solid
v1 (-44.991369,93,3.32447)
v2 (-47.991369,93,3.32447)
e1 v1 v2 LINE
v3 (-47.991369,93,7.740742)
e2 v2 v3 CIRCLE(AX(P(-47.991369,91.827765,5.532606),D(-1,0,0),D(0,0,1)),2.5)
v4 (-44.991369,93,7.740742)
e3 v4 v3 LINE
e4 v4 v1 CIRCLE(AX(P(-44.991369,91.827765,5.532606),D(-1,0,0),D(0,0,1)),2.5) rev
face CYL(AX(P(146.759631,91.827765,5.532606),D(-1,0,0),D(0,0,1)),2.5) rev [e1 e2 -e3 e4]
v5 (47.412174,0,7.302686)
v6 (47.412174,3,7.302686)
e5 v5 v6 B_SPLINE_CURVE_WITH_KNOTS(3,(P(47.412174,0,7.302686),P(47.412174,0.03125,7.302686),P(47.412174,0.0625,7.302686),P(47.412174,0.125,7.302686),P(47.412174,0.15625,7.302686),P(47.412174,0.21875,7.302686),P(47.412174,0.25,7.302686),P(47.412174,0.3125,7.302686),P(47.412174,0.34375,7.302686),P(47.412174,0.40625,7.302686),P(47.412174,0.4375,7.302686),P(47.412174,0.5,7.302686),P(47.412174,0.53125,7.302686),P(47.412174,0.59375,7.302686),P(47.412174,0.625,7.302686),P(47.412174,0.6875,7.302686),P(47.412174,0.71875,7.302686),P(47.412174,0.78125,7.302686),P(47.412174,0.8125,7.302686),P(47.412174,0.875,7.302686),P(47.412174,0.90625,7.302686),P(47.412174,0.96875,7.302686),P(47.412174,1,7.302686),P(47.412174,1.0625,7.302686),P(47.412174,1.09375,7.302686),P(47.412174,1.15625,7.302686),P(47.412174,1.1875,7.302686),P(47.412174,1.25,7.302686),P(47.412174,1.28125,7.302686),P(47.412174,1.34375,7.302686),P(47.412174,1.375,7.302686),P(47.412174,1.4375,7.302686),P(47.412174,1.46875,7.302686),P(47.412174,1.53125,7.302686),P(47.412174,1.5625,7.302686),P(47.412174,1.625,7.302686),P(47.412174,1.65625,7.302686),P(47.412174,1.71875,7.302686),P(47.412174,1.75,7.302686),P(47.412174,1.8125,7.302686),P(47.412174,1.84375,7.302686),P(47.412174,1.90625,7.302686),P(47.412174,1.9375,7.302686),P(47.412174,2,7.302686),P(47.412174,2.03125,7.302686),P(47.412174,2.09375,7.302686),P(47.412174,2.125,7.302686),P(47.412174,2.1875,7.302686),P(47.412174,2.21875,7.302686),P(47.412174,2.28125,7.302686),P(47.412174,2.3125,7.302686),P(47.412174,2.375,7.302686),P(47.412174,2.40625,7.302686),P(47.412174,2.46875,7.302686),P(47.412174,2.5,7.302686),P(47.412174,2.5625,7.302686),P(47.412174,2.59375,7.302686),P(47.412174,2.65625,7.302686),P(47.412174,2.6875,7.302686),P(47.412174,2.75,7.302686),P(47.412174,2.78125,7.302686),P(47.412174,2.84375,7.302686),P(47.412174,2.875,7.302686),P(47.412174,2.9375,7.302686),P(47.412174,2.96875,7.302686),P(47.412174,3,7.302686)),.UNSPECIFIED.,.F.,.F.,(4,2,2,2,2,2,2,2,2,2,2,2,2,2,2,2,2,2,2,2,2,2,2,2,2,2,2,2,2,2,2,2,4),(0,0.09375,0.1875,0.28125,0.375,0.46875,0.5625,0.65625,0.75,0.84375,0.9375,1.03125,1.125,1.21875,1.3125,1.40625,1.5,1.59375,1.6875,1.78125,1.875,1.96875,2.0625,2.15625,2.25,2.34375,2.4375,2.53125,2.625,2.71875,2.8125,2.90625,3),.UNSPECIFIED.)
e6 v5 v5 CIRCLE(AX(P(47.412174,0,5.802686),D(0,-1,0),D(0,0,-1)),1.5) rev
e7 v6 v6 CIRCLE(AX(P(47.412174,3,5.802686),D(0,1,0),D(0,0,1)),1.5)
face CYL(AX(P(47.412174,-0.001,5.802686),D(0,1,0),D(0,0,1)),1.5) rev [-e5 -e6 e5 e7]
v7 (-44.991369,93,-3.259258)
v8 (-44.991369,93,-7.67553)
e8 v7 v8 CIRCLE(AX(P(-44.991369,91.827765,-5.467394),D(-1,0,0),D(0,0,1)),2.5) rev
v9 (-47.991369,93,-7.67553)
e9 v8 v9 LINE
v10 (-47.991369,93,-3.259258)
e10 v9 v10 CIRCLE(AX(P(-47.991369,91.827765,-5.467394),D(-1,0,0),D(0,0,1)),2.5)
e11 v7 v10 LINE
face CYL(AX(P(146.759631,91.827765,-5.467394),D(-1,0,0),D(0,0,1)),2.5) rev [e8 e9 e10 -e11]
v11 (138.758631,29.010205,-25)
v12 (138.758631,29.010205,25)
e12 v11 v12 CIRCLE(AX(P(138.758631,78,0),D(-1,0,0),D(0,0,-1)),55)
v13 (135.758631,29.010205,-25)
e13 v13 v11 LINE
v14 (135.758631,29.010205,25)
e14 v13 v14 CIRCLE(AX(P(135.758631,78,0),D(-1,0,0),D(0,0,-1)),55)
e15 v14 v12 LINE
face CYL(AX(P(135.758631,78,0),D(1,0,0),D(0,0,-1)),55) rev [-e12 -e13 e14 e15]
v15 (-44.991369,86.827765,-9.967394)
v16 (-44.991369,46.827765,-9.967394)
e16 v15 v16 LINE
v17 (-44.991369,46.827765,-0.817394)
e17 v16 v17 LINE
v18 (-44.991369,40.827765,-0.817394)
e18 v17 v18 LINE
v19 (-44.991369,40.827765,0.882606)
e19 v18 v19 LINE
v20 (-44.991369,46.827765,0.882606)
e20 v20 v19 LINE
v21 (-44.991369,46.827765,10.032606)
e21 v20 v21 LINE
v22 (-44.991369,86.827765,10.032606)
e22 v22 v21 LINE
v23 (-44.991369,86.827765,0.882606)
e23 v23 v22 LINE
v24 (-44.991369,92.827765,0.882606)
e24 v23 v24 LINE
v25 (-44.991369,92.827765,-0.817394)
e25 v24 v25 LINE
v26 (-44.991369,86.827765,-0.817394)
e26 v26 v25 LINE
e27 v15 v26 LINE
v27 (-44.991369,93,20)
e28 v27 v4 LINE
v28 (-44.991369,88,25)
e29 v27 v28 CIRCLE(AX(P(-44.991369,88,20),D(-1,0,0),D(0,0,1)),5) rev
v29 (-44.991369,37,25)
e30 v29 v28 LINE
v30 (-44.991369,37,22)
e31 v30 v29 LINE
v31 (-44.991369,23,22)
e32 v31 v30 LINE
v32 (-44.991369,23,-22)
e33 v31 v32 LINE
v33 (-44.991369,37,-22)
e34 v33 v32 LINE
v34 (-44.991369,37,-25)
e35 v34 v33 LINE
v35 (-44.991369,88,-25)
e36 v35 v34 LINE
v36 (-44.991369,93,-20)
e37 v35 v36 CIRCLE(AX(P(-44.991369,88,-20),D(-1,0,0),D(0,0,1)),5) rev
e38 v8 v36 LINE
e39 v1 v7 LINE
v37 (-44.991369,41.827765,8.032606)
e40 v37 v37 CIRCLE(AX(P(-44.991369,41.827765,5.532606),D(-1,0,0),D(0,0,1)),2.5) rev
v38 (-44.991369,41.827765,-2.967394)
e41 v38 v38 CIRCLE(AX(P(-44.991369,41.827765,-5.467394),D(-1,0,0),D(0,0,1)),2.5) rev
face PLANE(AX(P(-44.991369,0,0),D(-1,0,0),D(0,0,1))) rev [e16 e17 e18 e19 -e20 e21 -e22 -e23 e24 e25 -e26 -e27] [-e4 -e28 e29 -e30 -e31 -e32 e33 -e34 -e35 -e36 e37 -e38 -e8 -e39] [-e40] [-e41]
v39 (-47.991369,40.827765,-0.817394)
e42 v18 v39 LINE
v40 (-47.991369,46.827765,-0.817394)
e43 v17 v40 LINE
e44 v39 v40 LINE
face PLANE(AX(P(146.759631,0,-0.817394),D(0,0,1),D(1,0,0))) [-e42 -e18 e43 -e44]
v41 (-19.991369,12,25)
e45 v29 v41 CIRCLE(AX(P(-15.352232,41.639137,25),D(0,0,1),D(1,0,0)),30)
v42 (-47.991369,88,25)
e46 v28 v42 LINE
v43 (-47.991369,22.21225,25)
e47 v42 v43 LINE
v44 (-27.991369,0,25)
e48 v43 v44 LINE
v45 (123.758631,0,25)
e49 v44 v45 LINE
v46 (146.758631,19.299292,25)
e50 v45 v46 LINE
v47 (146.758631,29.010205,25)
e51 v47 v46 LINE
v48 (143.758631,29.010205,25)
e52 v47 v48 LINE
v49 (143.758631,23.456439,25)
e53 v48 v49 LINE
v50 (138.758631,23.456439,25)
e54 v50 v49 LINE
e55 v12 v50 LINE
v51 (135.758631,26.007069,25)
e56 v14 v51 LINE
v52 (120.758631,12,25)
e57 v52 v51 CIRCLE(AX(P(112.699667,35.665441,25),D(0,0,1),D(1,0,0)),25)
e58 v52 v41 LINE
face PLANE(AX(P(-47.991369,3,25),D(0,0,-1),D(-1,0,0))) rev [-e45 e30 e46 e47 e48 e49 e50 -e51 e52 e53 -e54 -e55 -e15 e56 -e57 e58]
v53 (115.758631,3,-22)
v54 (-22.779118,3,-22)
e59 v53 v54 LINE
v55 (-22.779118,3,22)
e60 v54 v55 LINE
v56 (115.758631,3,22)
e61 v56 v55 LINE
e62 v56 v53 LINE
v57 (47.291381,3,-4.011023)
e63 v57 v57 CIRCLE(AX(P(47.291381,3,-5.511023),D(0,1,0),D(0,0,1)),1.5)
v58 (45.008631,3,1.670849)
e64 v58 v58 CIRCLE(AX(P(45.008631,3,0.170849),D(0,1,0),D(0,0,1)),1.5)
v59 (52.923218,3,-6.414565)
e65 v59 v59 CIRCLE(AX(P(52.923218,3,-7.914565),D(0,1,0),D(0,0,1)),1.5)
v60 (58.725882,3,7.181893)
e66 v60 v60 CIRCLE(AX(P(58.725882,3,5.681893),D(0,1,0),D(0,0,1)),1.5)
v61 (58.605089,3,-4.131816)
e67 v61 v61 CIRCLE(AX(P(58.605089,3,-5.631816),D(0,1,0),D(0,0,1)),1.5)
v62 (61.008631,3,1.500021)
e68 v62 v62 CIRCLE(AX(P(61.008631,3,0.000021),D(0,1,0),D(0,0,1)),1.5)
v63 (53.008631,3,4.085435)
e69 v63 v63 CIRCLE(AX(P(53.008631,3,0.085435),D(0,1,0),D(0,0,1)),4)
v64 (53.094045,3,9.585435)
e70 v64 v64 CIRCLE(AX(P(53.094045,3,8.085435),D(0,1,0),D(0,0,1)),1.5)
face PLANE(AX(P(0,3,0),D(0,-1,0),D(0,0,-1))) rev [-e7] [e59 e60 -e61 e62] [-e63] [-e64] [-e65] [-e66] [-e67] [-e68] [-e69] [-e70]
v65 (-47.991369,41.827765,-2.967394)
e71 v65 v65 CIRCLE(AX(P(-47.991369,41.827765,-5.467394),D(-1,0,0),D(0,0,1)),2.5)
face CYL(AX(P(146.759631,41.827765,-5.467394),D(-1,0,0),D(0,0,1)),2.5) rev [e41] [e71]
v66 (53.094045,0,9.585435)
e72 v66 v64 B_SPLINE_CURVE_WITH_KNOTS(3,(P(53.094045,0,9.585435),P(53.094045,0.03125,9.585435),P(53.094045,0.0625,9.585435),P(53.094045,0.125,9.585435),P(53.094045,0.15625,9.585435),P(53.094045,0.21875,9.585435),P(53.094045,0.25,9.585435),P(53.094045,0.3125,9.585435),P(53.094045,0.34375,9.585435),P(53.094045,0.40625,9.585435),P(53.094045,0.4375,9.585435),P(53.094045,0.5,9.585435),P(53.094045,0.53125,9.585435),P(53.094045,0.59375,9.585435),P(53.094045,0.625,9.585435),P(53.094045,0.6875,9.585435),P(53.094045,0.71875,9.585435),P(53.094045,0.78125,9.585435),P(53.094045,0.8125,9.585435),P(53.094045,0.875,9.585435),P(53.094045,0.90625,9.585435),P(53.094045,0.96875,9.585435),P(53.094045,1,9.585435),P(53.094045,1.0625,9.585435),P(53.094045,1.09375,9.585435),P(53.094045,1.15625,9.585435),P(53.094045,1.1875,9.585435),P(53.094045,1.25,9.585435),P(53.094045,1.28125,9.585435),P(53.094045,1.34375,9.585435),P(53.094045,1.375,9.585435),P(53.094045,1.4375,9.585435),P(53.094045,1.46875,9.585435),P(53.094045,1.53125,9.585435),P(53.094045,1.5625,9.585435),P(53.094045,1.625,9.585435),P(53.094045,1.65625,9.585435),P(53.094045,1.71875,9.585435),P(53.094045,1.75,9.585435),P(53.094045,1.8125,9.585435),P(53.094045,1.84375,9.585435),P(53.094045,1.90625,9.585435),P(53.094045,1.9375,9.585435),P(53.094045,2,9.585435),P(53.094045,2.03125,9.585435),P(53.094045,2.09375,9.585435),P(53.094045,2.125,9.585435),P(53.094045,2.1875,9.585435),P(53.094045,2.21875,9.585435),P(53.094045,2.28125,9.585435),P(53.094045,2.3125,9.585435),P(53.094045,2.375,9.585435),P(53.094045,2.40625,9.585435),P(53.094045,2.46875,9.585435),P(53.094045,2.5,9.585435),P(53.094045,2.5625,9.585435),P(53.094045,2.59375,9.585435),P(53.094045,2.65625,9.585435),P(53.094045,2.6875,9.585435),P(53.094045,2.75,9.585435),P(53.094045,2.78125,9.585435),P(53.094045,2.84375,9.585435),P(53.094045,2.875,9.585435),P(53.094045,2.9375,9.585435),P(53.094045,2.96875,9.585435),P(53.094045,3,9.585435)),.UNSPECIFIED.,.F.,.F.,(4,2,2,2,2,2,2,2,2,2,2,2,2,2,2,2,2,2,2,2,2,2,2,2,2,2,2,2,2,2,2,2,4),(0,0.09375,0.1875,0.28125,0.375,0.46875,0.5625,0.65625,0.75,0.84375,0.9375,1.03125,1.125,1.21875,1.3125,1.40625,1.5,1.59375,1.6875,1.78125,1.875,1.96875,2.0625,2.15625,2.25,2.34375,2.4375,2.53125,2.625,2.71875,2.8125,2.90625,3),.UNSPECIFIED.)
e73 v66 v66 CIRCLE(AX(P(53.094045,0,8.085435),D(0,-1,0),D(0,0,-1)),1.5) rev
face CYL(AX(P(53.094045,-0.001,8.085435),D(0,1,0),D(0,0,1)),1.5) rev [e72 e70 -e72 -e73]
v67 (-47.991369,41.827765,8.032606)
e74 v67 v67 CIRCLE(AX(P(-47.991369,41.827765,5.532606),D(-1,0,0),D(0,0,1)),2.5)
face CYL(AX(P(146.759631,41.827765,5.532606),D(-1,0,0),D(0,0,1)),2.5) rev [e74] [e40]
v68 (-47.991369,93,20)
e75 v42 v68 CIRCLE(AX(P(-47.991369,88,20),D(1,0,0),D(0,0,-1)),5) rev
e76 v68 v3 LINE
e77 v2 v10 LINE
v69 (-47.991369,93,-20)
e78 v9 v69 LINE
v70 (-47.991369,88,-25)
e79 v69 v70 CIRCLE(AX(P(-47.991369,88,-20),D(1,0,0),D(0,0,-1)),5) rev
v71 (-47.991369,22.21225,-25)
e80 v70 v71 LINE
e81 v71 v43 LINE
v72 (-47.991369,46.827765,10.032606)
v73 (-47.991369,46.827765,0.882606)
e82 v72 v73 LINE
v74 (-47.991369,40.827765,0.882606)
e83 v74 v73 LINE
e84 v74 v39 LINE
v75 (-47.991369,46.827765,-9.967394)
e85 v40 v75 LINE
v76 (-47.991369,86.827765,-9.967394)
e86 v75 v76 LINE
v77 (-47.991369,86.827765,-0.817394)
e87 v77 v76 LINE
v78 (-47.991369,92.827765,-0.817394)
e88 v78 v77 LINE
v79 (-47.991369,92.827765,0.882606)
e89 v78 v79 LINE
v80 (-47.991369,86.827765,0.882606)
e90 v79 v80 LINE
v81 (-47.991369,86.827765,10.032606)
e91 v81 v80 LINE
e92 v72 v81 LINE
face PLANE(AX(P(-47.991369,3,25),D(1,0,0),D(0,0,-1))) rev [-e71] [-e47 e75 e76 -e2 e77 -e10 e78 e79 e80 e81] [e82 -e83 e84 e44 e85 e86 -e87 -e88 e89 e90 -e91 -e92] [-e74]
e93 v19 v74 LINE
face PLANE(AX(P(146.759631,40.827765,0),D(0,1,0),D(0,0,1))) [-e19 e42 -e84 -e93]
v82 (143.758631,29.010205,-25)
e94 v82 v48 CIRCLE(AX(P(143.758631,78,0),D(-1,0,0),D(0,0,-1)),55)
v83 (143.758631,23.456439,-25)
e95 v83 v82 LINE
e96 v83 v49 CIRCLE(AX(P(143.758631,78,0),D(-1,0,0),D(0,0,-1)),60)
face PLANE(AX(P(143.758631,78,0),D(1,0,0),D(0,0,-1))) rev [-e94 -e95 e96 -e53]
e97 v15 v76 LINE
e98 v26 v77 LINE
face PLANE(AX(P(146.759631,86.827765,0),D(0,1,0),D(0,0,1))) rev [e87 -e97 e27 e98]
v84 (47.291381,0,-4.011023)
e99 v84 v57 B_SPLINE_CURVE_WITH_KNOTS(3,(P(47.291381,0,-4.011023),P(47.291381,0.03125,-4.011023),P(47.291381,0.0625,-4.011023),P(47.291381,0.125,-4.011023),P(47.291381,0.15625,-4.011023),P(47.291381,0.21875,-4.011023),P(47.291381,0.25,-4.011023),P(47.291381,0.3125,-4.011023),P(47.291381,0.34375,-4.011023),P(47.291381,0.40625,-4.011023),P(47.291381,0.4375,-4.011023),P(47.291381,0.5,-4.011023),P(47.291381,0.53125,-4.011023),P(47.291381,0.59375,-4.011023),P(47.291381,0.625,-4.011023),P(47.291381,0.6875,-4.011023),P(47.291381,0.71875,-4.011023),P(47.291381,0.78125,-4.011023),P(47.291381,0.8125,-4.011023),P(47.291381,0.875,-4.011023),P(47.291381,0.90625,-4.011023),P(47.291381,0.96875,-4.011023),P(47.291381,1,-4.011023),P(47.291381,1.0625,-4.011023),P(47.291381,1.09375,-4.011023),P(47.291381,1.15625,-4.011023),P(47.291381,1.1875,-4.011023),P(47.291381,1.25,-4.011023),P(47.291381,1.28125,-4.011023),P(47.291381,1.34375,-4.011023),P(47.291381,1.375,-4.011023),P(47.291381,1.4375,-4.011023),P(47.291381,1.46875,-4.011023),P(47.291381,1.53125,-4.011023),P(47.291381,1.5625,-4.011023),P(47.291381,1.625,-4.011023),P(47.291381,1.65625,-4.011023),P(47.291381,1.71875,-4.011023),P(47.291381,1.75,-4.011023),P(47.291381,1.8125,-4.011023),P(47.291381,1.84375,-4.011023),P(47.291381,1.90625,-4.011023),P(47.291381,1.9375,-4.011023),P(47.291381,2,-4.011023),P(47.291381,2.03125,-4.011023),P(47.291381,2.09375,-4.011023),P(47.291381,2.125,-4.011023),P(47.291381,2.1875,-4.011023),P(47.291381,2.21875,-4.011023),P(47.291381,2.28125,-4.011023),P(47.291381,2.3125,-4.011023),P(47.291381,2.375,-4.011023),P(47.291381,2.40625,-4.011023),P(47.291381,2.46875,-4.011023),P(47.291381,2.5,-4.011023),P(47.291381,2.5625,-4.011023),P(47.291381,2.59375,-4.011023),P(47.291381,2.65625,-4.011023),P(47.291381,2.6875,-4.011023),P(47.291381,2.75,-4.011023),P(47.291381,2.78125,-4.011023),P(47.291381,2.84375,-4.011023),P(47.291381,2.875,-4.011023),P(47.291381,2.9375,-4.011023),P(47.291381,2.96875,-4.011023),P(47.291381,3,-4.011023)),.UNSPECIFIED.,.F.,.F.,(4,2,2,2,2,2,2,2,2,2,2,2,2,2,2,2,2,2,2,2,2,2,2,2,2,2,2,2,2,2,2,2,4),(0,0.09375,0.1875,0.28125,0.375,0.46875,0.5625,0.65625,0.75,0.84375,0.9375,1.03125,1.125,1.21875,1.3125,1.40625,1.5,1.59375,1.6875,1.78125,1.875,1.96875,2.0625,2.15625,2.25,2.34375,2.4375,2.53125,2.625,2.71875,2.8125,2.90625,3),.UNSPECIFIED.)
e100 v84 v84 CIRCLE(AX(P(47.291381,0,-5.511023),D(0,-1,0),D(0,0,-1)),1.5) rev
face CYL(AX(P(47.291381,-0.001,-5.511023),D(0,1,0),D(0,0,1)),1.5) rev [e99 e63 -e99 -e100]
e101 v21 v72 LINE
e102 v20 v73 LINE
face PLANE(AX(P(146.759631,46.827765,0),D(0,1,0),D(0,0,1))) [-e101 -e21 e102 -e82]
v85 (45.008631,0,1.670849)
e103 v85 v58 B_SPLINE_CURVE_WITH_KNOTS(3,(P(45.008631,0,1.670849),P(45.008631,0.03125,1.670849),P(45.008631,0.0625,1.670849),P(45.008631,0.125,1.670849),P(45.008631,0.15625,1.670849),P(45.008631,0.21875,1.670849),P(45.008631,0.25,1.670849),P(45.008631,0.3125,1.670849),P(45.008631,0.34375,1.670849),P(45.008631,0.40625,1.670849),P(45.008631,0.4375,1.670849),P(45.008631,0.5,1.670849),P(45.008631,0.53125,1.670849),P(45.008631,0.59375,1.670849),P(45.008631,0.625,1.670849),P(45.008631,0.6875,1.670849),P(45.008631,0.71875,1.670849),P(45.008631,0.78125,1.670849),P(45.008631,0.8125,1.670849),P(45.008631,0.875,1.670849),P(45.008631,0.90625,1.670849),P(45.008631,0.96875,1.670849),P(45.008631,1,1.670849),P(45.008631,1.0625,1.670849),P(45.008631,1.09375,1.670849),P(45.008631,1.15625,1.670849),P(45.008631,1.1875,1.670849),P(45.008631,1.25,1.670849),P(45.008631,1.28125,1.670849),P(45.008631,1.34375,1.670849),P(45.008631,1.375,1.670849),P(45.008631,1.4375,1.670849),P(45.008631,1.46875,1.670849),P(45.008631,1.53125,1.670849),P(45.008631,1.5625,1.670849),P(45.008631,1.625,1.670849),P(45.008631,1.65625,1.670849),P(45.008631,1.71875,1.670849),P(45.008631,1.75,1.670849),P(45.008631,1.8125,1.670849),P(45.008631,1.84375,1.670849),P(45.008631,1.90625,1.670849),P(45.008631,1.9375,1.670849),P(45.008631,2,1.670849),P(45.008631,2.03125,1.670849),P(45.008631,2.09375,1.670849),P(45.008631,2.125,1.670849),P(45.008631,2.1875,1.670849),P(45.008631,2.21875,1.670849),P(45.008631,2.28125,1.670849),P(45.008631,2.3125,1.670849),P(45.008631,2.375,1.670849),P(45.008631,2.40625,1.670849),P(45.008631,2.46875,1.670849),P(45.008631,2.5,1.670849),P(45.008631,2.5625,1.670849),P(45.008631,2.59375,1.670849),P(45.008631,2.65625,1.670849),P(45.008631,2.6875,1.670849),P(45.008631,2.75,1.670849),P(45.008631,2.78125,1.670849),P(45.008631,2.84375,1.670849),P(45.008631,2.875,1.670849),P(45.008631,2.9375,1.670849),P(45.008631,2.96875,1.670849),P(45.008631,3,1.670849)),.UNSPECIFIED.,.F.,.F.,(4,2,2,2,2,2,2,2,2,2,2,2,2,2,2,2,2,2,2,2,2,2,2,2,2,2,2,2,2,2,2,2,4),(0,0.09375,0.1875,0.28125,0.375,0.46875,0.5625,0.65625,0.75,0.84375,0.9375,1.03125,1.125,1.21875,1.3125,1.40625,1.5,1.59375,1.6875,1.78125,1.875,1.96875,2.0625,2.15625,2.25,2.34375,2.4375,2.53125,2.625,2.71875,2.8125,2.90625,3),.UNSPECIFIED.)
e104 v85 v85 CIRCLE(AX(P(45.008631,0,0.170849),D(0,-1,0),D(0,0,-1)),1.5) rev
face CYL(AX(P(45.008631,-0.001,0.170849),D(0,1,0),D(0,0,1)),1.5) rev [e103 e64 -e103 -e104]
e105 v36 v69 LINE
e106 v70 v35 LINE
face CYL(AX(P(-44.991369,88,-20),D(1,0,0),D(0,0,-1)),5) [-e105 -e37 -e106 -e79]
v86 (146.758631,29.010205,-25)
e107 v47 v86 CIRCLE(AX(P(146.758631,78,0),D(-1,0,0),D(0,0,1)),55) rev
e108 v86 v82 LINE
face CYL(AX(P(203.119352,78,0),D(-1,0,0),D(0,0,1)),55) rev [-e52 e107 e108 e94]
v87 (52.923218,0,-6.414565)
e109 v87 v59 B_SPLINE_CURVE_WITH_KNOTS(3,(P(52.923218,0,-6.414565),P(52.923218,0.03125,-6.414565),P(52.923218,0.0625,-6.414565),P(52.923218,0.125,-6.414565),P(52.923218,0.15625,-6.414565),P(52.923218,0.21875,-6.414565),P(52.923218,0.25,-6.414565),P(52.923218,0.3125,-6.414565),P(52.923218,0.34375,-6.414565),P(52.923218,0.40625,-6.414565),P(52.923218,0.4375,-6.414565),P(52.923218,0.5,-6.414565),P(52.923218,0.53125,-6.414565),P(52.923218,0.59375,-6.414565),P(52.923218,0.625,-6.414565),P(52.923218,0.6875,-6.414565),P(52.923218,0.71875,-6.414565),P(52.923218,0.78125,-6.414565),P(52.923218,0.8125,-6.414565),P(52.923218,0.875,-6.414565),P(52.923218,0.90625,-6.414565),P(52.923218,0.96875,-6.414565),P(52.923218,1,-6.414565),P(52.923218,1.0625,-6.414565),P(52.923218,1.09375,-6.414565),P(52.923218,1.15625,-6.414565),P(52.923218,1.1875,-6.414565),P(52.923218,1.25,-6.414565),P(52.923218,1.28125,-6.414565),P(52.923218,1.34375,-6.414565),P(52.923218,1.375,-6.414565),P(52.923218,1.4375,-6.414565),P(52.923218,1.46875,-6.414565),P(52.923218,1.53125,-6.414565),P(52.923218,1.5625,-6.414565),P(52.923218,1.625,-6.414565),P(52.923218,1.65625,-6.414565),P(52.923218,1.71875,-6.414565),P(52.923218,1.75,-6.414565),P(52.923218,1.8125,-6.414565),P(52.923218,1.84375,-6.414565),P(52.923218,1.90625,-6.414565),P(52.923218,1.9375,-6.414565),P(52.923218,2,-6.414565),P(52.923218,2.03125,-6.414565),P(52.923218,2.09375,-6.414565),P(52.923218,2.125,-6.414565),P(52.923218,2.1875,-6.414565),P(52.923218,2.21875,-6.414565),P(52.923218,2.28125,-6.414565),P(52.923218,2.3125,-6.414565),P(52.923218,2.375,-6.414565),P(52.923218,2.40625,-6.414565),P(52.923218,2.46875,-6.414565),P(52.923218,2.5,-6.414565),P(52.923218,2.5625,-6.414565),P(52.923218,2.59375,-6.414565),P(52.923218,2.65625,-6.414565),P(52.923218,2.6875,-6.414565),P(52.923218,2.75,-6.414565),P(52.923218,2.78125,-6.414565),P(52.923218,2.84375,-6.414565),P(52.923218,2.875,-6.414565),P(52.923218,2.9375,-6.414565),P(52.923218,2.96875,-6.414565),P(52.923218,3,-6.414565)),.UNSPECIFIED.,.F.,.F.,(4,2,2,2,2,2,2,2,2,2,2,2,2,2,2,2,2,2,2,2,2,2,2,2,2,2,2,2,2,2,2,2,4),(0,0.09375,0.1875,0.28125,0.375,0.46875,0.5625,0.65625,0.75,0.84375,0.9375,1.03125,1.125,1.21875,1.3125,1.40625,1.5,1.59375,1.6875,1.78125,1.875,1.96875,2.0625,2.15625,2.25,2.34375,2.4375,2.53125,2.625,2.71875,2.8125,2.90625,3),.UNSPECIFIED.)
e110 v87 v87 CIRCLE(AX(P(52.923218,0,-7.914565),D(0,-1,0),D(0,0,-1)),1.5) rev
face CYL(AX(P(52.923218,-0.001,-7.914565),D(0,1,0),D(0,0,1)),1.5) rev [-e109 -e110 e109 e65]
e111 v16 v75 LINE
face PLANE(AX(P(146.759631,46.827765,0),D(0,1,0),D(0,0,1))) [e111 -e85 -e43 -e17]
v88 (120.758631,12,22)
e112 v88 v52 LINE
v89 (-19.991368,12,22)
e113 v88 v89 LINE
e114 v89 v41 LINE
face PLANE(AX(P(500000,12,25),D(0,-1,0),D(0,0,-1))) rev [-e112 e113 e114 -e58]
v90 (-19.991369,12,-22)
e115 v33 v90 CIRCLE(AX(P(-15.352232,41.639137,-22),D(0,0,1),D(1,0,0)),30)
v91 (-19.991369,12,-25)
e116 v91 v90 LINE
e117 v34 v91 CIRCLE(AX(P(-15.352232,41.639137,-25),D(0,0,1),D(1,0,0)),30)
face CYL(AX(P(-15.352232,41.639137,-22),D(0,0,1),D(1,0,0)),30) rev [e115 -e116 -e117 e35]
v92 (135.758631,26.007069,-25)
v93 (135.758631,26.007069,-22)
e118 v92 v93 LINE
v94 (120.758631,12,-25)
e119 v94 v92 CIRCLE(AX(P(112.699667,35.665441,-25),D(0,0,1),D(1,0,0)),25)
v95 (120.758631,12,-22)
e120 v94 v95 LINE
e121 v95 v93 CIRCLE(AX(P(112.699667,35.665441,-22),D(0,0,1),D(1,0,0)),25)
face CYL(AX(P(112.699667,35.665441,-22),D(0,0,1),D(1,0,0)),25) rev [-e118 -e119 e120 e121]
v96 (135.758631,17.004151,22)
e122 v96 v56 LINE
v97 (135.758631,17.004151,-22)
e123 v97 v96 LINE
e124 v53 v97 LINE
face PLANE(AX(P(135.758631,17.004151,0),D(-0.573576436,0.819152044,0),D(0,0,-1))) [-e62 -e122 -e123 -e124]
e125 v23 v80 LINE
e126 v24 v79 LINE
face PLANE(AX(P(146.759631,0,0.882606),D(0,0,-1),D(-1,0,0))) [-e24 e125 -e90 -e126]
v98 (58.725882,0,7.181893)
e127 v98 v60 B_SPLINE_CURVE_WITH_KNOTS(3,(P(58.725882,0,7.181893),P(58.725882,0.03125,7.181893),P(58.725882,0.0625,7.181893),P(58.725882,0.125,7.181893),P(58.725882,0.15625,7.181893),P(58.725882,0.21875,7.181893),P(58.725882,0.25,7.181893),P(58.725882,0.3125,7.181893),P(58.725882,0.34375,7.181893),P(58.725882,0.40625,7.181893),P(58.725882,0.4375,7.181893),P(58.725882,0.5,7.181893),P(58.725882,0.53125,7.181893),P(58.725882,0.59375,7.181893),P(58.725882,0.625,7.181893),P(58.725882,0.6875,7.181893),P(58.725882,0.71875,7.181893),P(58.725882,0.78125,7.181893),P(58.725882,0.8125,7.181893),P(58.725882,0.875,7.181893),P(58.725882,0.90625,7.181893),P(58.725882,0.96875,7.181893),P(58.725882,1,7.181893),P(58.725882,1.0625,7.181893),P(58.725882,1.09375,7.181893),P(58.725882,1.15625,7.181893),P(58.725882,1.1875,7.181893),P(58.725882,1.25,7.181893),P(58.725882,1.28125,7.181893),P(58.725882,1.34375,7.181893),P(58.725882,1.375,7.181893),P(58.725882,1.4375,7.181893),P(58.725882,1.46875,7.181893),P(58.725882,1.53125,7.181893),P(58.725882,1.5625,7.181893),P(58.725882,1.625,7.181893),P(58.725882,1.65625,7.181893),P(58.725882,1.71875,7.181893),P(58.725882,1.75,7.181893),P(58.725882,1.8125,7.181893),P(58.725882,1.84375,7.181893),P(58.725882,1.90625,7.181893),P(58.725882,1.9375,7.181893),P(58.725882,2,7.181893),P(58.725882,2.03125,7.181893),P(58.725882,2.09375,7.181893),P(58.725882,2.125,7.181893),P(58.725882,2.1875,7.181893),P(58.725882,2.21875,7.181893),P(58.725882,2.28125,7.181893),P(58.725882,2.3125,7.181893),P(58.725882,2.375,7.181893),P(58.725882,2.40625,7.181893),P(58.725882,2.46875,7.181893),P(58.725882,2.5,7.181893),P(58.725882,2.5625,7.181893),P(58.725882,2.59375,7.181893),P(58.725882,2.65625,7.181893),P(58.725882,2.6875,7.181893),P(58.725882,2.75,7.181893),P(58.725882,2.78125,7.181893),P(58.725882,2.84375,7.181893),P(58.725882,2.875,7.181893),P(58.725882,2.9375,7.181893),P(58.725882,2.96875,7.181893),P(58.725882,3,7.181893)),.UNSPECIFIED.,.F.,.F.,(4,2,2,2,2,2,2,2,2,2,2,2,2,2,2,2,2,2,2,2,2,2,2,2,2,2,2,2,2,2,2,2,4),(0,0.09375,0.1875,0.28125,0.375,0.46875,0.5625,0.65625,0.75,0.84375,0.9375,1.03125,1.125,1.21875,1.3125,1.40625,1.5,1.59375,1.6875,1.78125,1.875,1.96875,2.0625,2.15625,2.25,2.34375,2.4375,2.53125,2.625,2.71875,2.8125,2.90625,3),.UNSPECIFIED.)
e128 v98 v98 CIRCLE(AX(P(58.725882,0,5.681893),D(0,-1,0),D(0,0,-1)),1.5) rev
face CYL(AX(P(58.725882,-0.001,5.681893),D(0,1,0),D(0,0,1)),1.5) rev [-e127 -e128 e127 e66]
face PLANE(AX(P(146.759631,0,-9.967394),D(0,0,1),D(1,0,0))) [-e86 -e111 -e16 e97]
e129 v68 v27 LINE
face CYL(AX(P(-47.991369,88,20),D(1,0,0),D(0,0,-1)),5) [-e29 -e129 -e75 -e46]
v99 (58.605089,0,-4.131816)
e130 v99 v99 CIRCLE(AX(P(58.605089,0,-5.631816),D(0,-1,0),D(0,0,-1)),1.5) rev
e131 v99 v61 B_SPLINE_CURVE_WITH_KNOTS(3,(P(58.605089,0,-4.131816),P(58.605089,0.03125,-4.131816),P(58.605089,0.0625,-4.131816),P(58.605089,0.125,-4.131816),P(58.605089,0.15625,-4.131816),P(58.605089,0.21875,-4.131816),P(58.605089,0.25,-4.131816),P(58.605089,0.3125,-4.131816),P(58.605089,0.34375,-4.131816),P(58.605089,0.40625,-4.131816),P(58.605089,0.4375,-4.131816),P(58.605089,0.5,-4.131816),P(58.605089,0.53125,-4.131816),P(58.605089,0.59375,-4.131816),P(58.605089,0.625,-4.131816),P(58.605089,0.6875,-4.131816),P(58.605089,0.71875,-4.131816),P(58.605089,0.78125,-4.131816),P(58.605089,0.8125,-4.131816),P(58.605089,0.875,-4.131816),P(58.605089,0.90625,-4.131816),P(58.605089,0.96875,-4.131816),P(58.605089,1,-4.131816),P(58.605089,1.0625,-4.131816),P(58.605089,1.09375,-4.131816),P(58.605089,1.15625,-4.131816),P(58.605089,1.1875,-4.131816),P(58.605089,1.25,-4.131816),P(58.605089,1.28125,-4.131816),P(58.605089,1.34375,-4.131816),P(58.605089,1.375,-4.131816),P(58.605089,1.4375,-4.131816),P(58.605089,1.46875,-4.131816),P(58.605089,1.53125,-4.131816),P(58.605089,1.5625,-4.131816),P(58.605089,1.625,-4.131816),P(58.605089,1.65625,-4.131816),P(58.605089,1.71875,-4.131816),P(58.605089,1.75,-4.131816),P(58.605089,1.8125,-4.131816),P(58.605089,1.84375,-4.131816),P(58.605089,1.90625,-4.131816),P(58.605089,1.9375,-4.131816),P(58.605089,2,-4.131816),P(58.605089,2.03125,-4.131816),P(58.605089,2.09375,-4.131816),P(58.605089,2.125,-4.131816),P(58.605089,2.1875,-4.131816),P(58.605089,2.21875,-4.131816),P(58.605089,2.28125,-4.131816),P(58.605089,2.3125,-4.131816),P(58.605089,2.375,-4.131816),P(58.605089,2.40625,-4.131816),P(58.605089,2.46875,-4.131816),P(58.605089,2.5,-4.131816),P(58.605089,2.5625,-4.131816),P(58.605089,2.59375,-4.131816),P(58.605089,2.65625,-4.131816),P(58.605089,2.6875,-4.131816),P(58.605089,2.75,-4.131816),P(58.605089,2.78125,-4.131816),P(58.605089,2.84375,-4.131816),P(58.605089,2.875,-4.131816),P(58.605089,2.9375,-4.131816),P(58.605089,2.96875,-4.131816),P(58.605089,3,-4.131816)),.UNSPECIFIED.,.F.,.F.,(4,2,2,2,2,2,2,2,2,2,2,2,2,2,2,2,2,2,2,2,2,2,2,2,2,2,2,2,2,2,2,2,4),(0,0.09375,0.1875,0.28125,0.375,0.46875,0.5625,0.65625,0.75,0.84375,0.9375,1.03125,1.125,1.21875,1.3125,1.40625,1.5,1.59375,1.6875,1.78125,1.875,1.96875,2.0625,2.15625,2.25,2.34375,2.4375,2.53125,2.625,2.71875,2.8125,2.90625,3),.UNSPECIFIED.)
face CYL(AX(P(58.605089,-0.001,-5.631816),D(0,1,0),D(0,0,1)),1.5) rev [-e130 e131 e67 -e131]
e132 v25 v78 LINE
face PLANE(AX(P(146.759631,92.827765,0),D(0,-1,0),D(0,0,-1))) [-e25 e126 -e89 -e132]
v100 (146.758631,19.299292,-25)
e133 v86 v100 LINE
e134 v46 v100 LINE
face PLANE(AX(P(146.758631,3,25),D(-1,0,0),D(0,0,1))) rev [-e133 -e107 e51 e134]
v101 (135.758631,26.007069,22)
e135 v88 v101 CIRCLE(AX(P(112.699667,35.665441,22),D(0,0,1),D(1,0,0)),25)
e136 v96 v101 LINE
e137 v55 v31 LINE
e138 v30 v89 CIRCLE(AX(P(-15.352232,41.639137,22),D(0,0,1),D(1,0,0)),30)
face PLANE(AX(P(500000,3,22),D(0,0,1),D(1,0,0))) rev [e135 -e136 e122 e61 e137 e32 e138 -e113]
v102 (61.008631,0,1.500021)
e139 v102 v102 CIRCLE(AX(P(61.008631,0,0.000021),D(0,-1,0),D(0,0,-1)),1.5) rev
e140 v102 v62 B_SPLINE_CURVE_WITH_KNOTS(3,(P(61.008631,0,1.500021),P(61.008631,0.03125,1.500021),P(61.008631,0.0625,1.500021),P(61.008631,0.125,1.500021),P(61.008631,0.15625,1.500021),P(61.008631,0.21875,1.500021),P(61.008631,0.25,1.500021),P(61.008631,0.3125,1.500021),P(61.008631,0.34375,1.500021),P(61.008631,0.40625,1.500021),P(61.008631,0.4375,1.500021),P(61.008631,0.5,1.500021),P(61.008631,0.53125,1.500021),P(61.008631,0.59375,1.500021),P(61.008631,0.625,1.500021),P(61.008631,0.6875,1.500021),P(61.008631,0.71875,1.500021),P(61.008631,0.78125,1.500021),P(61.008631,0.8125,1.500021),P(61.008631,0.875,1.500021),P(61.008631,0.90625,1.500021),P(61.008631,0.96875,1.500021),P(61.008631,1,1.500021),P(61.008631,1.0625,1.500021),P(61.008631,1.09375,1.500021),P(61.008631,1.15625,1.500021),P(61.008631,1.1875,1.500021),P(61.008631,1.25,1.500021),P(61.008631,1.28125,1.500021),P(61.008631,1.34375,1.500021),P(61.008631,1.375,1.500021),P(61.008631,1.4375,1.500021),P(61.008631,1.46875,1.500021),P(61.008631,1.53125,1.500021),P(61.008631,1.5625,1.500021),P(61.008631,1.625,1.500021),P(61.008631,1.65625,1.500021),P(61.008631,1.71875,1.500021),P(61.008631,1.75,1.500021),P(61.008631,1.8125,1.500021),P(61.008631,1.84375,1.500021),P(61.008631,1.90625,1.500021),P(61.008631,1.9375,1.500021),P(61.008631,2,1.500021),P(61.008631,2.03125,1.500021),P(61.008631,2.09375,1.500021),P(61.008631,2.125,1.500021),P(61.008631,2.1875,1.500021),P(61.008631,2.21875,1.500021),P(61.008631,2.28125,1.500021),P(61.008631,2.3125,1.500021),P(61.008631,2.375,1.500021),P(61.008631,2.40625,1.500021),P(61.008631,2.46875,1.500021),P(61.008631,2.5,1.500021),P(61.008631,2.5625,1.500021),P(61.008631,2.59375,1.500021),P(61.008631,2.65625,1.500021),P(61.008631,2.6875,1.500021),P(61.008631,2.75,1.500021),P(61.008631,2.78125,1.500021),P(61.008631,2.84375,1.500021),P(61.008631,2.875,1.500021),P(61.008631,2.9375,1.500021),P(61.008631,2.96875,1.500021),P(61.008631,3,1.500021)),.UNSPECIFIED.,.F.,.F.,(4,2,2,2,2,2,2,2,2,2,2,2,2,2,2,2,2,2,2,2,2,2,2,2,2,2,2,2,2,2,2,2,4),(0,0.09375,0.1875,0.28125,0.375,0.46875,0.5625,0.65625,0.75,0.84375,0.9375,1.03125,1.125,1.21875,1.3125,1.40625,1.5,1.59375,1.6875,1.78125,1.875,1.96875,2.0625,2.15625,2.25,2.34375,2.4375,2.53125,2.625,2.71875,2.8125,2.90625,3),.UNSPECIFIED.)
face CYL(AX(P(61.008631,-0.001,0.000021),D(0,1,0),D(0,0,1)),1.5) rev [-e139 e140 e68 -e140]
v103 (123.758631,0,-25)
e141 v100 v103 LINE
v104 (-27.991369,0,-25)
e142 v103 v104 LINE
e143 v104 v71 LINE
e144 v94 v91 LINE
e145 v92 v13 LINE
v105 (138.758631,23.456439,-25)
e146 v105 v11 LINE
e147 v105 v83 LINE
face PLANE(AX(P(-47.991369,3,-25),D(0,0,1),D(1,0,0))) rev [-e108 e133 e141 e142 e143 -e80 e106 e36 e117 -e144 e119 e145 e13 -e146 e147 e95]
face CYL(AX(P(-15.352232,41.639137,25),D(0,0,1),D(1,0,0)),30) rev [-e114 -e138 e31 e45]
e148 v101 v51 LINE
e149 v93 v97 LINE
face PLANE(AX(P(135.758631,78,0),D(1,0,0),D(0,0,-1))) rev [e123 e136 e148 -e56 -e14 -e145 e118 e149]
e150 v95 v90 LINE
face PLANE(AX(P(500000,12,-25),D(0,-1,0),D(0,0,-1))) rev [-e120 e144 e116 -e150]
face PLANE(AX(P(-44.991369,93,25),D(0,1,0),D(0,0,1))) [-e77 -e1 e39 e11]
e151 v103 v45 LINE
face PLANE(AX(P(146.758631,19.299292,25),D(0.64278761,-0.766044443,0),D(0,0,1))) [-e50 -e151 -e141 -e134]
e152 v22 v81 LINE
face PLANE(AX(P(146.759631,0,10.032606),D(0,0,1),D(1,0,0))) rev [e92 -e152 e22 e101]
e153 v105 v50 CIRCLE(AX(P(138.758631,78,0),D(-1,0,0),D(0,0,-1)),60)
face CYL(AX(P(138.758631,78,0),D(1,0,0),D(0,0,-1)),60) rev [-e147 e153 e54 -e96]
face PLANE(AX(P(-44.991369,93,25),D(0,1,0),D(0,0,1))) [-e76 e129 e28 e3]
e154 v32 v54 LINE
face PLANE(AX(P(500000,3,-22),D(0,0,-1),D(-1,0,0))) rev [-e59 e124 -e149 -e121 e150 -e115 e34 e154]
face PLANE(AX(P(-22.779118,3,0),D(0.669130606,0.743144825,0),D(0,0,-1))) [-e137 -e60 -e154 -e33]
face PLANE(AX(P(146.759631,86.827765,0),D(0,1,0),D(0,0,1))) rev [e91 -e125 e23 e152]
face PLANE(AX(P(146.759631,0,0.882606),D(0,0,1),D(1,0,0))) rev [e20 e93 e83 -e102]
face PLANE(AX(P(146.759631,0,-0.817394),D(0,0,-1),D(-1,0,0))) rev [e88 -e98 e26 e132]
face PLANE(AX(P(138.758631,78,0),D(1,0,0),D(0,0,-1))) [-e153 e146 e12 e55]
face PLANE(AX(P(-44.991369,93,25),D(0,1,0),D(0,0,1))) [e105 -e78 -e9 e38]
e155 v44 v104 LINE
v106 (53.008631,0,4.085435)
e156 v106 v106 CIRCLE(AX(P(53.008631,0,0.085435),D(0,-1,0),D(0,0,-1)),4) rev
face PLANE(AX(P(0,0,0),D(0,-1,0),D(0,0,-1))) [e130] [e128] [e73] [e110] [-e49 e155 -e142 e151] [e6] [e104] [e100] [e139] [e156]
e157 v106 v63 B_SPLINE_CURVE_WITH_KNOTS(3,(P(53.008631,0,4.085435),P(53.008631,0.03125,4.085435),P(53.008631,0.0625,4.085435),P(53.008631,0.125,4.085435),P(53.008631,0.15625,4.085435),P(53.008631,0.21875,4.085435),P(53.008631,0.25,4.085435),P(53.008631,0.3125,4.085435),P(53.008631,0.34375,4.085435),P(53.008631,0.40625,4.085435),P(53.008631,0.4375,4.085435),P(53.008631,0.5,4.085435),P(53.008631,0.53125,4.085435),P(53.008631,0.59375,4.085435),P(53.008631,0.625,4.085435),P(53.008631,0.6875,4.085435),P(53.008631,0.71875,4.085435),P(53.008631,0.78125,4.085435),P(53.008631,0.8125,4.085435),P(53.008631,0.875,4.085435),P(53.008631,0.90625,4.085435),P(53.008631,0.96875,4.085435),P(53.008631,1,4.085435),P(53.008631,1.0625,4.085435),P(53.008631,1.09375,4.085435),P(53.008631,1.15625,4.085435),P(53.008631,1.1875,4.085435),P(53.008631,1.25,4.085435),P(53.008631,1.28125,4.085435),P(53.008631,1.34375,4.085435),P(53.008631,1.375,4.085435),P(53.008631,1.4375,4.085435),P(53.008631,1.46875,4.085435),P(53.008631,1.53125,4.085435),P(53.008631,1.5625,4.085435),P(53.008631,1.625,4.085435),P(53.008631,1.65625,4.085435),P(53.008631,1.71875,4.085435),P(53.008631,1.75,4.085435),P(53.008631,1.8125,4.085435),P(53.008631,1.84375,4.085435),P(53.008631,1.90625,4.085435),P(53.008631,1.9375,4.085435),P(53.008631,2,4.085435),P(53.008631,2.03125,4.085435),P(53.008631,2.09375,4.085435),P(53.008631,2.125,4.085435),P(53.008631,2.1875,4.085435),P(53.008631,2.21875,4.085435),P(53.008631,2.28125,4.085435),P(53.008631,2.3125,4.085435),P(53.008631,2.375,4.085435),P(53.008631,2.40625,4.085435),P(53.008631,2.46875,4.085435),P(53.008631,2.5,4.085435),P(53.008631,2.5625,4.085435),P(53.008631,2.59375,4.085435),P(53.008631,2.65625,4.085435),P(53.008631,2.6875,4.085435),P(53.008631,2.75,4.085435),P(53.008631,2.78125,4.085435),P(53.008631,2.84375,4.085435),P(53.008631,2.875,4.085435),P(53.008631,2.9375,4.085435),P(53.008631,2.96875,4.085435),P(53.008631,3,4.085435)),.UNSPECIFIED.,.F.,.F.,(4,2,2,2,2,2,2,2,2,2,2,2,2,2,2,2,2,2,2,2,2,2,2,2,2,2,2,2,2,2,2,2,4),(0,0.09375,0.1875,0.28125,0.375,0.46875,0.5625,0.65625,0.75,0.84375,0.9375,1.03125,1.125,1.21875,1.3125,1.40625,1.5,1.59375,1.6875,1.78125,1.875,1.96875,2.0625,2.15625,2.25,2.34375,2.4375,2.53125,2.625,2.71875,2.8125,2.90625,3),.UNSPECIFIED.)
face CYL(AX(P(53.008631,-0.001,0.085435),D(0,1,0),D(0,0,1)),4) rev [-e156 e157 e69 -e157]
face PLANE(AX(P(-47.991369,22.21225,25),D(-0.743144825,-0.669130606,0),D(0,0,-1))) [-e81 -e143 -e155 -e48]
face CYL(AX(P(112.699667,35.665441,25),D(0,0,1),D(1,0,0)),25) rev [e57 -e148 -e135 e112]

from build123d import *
from OCP.BRepFilletAPI import BRepFilletAPI_MakeChamfer

# Parameters (mm, degrees)
SKETCH1_W           = 194.75
SKETCH1_H           = 50
BOSS_EXTRUDE1_DEPTH = 3
BOSS_EXTRUDE2_START = -3
BOSS_EXTRUDE2_DEPTH = 5
BOSS_EXTRUDE3_DEPTH = 3
BOSS_EXTRUDE4_START = -3
BOSS_EXTRUDE4_DEPTH = 3
SKETCH6_W           = 50
SKETCH6_H           = 90
BOSS_EXTRUDE5_DEPTH = 3
BOSS_EXTRUDE6_REACH = 216.574
SKETCH7_W           = 3
SKETCH7_H           = 9
RIB1_START          = -3
RIB1_DEPTH          = 3
LPATTERN1_COUNT     = 2
LPATTERN1_PITCH     = 47
RIB2_START          = -3
RIB2_DEPTH          = 3
LPATTERN2_COUNT     = 2
LPATTERN2_PITCH     = 47
CUT_EXTRUDE1_REACH  = 175.963
SKETCH10_R          = 4
SKETCH10_R_2        = 1.5
FILLET1_R           = 5
CHAMFER1_SIZE       = 20
CHAMFER1_SIZE2      = 22.212250297
CHAMFER2_SIZE       = 20
CHAMFER2_SIZE2      = 14.004150764
CHAMFER3_SIZE       = 23
CHAMFER3_SIZE2      = 19.299291517
CUT_EXTRUDE2_REACH  = 219.259
SKETCH11_W          = 1.7
SKETCH11_H          = 6
SKETCH11_R          = 2.5


# Read off the part's stored shape, not the designer's step: Rib1, Rib2
with BuildPart() as part:
    # Sketch1 → Boss-Extrude1 (new body)
    with BuildSketch(Plane(origin=(0, 0, 0), x_dir=(1, 0, 0), z_dir=(0, 1, 0))):
        with Locations((49.3836315, 0)):
            Rectangle(SKETCH1_W, SKETCH1_H)
    extrude(amount=BOSS_EXTRUDE1_DEPTH)

    # Sketch2 → Boss-Extrude2 (add)
    with BuildSketch(Plane(origin=(146.7586315, 0, 0), x_dir=(0, 0, -1), z_dir=(1, 0, 0)).offset(BOSS_EXTRUDE2_START)):
        with BuildLine():
            Line((25, 3), (25, 23.456439427))
            ThreePointArc((25, 23.456439427), (0, 18), (-25, 23.456439427))
            Line((-25, 23.456439427), (-25, 3))
            Line((-25, 3), (25, 3))
        make_face()
    extrude(amount=-BOSS_EXTRUDE2_DEPTH)

    # Sketch3 → Boss-Extrude3 (add)
    with BuildSketch(Plane(origin=(143.7586315, 0, 0), x_dir=(0, 0, -1), z_dir=(1, 0, 0))):
        with BuildLine():
            Line((-25, 3), (25, 3))
            Line((25, 3), (25, 29.010205144))
            ThreePointArc((25, 29.010205144), (0, 23), (-25, 29.010205144))
            Line((-25, 29.010205144), (-25, 3))
        make_face()
    extrude(amount=BOSS_EXTRUDE3_DEPTH)

    # Sketch4 → Boss-Extrude4 (add)
    with BuildSketch(Plane(origin=(138.7586315, 0, 0), x_dir=(0, 0, -1), z_dir=(1, 0, 0)).offset(BOSS_EXTRUDE4_START)):
        with BuildLine():
            Line((-25, 0), (-25, 29.010205144))
            ThreePointArc((-25, 29.010205144), (0, 23), (25, 29.010205144))
            Line((25, 29.010205144), (25, 0))
            Line((25, 0), (-25, 0))
        make_face()
    extrude(amount=BOSS_EXTRUDE4_DEPTH)

    # Sketch6 → Boss-Extrude5 (add)
    with BuildSketch(Plane.ZY.offset(47.9913685)):
        with Locations((0, 48)):
            Rectangle(SKETCH6_W, SKETCH6_H)
    extrude(amount=-BOSS_EXTRUDE5_DEPTH)

    # Sketch7 → Boss-Extrude6 (add, up to next)
    with BuildSketch(Plane(origin=(-44.9913685, 0, 0), x_dir=(0, 0, -1), z_dir=(1, 0, 0)), mode=Mode.PRIVATE) as boss_extrude6_sk1:
        with Locations((-23.5, 7.5)):
            Rectangle(SKETCH7_W, SKETCH7_H)
    boss_extrude6_tool1 = extrude(boss_extrude6_sk1.sketch, amount=BOSS_EXTRUDE6_REACH, mode=Mode.PRIVATE) - part.part
    # Sketch7 → Boss-Extrude6 (add, up to next)
    with BuildSketch(Plane(origin=(-44.9913685, 0, 0), x_dir=(0, 0, -1), z_dir=(1, 0, 0)), mode=Mode.PRIVATE) as boss_extrude6_sk2:
        with Locations((23.5, 7.5)):
            Rectangle(SKETCH7_W, SKETCH7_H)
    boss_extrude6_tool2 = extrude(boss_extrude6_sk2.sketch, amount=BOSS_EXTRUDE6_REACH, mode=Mode.PRIVATE) - part.part
    add(boss_extrude6_tool1.solids().sort_by_distance((-44.991369, 7.5, 23.5))[0])
    add(boss_extrude6_tool2.solids().sort_by_distance((-44.991369, 7.5, -23.5))[0])

    # Rib1 outline → Rib1 (add)
    with BuildSketch(Plane.XY.offset(25).offset(RIB1_START)):
        with BuildLine():
            ThreePointArc((-19.991368497, 11.999999999), (-36.565435434, 20.425933064), (-44.9913685, 37))
            Line((-44.9913685, 37), (-44.9913685, 12))
            Line((-44.9913685, 12), (-19.991368497, 11.999999999))
        make_face()
    rib1 = extrude(amount=RIB1_DEPTH)

    # LPattern1: Rib1 ×2
    with Locations(*[(0, 0, -i * LPATTERN1_PITCH) for i in range(1, LPATTERN1_COUNT)]):
        add(rib1)

    # Rib2 outline → Rib2 (add)
    with BuildSketch(Plane.XY.offset(25).offset(RIB2_START)):
        with BuildLine():
            ThreePointArc((135.7586315, 26.007069295), (129.762224626, 17.393355072), (120.7586315, 12))
            Line((120.7586315, 12), (135.7586315, 12))
            Line((135.7586315, 12), (135.7586315, 26.007069295))
        make_face()
    rib2 = extrude(amount=RIB2_DEPTH)

    # LPattern2: Rib2 ×2
    with Locations(*[(0, 0, -i * LPATTERN2_PITCH) for i in range(1, LPATTERN2_COUNT)]):
        add(rib2)

    # Sketch10 → Cut-Extrude1 (cut, up to next)
    with BuildSketch(Plane(origin=(0, 3, 0), x_dir=(1, 0, 0), z_dir=(0, 1, 0)), mode=Mode.PRIVATE) as cut_extrude1_sk1:
        with Locations(Location((53.0086315, -0.085435095, 0), (0, 0, 270))):
            Circle(SKETCH10_R)
    cut_extrude1_tool1 = extrude(cut_extrude1_sk1.sketch, amount=-CUT_EXTRUDE1_REACH, mode=Mode.PRIVATE) & part.part
    # Sketch10 → Cut-Extrude1 (cut, up to next)
    with BuildSketch(Plane(origin=(0, 3, 0), x_dir=(1, 0, 0), z_dir=(0, 1, 0)), mode=Mode.PRIVATE) as cut_extrude1_sk2:
        with Locations(Location((61.0086315, -2.1452e-05, 0), (0, 0, 270))):
            Circle(SKETCH10_R_2)
    cut_extrude1_tool2 = extrude(cut_extrude1_sk2.sketch, amount=-CUT_EXTRUDE1_REACH, mode=Mode.PRIVATE) & part.part
    # Sketch10 → Cut-Extrude1 (cut, up to next)
    with BuildSketch(Plane(origin=(0, 3, 0), x_dir=(1, 0, 0), z_dir=(0, 1, 0)), mode=Mode.PRIVATE) as cut_extrude1_sk3:
        with Locations(Location((58.725882315, -5.681892778, 0), (0, 0, 270))):
            Circle(SKETCH10_R_2)
    cut_extrude1_tool3 = extrude(cut_extrude1_sk3.sketch, amount=-CUT_EXTRUDE1_REACH, mode=Mode.PRIVATE) & part.part
    # Sketch10 → Cut-Extrude1 (cut, up to next)
    with BuildSketch(Plane(origin=(0, 3, 0), x_dir=(1, 0, 0), z_dir=(0, 1, 0)), mode=Mode.PRIVATE) as cut_extrude1_sk4:
        with Locations(Location((53.094045142, -8.085435095, 0), (0, 0, 270))):
            Circle(SKETCH10_R_2)
    cut_extrude1_tool4 = extrude(cut_extrude1_sk4.sketch, amount=-CUT_EXTRUDE1_REACH, mode=Mode.PRIVATE) & part.part
    # Sketch10 → Cut-Extrude1 (cut, up to next)
    with BuildSketch(Plane(origin=(0, 3, 0), x_dir=(1, 0, 0), z_dir=(0, 1, 0)), mode=Mode.PRIVATE) as cut_extrude1_sk5:
        with Locations(Location((47.412173816, -5.80268591, 0), (0, 0, 270))):
            Circle(SKETCH10_R_2)
    cut_extrude1_tool5 = extrude(cut_extrude1_sk5.sketch, amount=-CUT_EXTRUDE1_REACH, mode=Mode.PRIVATE) & part.part
    # Sketch10 → Cut-Extrude1 (cut, up to next)
    with BuildSketch(Plane(origin=(0, 3, 0), x_dir=(1, 0, 0), z_dir=(0, 1, 0)), mode=Mode.PRIVATE) as cut_extrude1_sk6:
        with Locations(Location((45.0086315, -0.170848737, 0), (0, 0, 270))):
            Circle(SKETCH10_R_2)
    cut_extrude1_tool6 = extrude(cut_extrude1_sk6.sketch, amount=-CUT_EXTRUDE1_REACH, mode=Mode.PRIVATE) & part.part
    # Sketch10 → Cut-Extrude1 (cut, up to next)
    with BuildSketch(Plane(origin=(0, 3, 0), x_dir=(1, 0, 0), z_dir=(0, 1, 0)), mode=Mode.PRIVATE) as cut_extrude1_sk7:
        with Locations(Location((47.291380684, 5.511022589, 0), (0, 0, 270))):
            Circle(SKETCH10_R_2)
    cut_extrude1_tool7 = extrude(cut_extrude1_sk7.sketch, amount=-CUT_EXTRUDE1_REACH, mode=Mode.PRIVATE) & part.part
    # Sketch10 → Cut-Extrude1 (cut, up to next)
    with BuildSketch(Plane(origin=(0, 3, 0), x_dir=(1, 0, 0), z_dir=(0, 1, 0)), mode=Mode.PRIVATE) as cut_extrude1_sk8:
        with Locations(Location((52.923217857, 7.914564905, 0), (0, 0, 270))):
            Circle(SKETCH10_R_2)
    cut_extrude1_tool8 = extrude(cut_extrude1_sk8.sketch, amount=-CUT_EXTRUDE1_REACH, mode=Mode.PRIVATE) & part.part
    # Sketch10 → Cut-Extrude1 (cut, up to next)
    with BuildSketch(Plane(origin=(0, 3, 0), x_dir=(1, 0, 0), z_dir=(0, 1, 0)), mode=Mode.PRIVATE) as cut_extrude1_sk9:
        with Locations(Location((58.605089183, 5.631815721, 0), (0, 0, 270))):
            Circle(SKETCH10_R_2)
    cut_extrude1_tool9 = extrude(cut_extrude1_sk9.sketch, amount=-CUT_EXTRUDE1_REACH, mode=Mode.PRIVATE) & part.part
    add(cut_extrude1_tool1.solids().sort_by_distance((53.008631, 3, 0.085435))[0], mode=Mode.SUBTRACT)
    add(cut_extrude1_tool2.solids().sort_by_distance((61.008631, 3, 2.1e-05))[0], mode=Mode.SUBTRACT)
    add(cut_extrude1_tool3.solids().sort_by_distance((58.725882, 3, 5.681893))[0], mode=Mode.SUBTRACT)
    add(cut_extrude1_tool4.solids().sort_by_distance((53.094045, 3, 8.085435))[0], mode=Mode.SUBTRACT)
    add(cut_extrude1_tool5.solids().sort_by_distance((47.412174, 3, 5.802686))[0], mode=Mode.SUBTRACT)
    add(cut_extrude1_tool6.solids().sort_by_distance((45.008631, 3, 0.170849))[0], mode=Mode.SUBTRACT)
    add(cut_extrude1_tool7.solids().sort_by_distance((47.291381, 3, -5.511023))[0], mode=Mode.SUBTRACT)
    add(cut_extrude1_tool8.solids().sort_by_distance((52.923218, 3, -7.914565))[0], mode=Mode.SUBTRACT)
    add(cut_extrude1_tool9.solids().sort_by_distance((58.605089, 3, -5.631816))[0], mode=Mode.SUBTRACT)

    # Fillet1
    fillet1_edges = [part.edges().sort_by_distance(p)[0] for p in [
        (-46.4913685, 93, 25),
        (-46.4913685, 93, -25),
    ]]
    fillet(fillet1_edges, radius=FILLET1_R)

    # Chamfer1: one chamfer whose edges measure the first distance from different faces: ONE call of the kernel's chamfer builder (chamfer() names one face for all edges)
    chamfer1_edges_1 = [part.edges().sort_by_distance(p)[0] for p in [
        (-47.9913685, 0, 0),
    ]]
    chamfer1_side_1 = [part.faces().sort_by_distance(p)[0] for p in [
        (-45.98070785, 0, 0),
    ]]
    chamfer1_edges_2 = [part.edges().sort_by_distance(p)[0] for p in [
        (-44.9913685, 3, 0),
    ]]
    chamfer1_side_2 = [part.faces().sort_by_distance(p)[0] for p in [
        (-44.9913685, 49.22305707, 0),
    ]]
    chamfer1 = BRepFilletAPI_MakeChamfer(part.part.solid().wrapped)
    for e in chamfer1_edges_1:
        chamfer1.Add(CHAMFER1_SIZE, CHAMFER1_SIZE2, e.wrapped, chamfer1_side_1[0].wrapped)  # the first distance lies on this face
    for e in chamfer1_edges_2:
        chamfer1.Add(CHAMFER1_SIZE, CHAMFER1_SIZE2, e.wrapped, chamfer1_side_2[0].wrapped)  # the first distance lies on this face
    add(Compound.cast(chamfer1.Shape()), mode=Mode.REPLACE)

    # Chamfer2
    chamfer2_edges = [part.edges().sort_by_distance(p)[0] for p in [
        (135.7586315, 3, 0),
    ]]
    chamfer2_side = [part.faces().sort_by_distance(p)[0] for p in [
        (56.489756648, 3, -20.354697047),
    ]]
    chamfer(chamfer2_edges, length=CHAMFER2_SIZE, length2=CHAMFER2_SIZE2, reference=chamfer2_side[0])

    # Chamfer3
    chamfer3_edges = [part.edges().sort_by_distance(p)[0] for p in [
        (146.7586315, 0, 0),
    ]]
    chamfer3_side = [part.faces().sort_by_distance(p)[0] for p in [
        (59.462529077, 0, -0.001057352),
    ]]
    chamfer(chamfer3_edges, length=CHAMFER3_SIZE, length2=CHAMFER3_SIZE2, reference=chamfer3_side[0])

    # Sketch11 → Cut-Extrude2 (cut, up to next)
    with BuildSketch(Plane.ZY.offset(47.9913685), mode=Mode.PRIVATE) as cut_extrude2_sk1:
        with Locations((0.032606221, 89.827764741)):
            Rectangle(SKETCH11_W, SKETCH11_H)
    cut_extrude2_tool1 = extrude(cut_extrude2_sk1.sketch, amount=-CUT_EXTRUDE2_REACH, mode=Mode.PRIVATE) & part.part
    # Sketch11 → Cut-Extrude2 (cut, up to next)
    with BuildSketch(Plane.ZY.offset(47.9913685), mode=Mode.PRIVATE) as cut_extrude2_sk2:
        Polygon((0.882606221, 86.827764741), (-0.817393779, 86.827764741), (-9.967393779, 86.827764741), (-9.967393779, 46.827764741), (-0.817393779, 46.827764741), (0.882606221, 46.827764741), (10.032606221, 46.827764741), (10.032606221, 86.827764741), align=None)
    cut_extrude2_tool2 = extrude(cut_extrude2_sk2.sketch, amount=-CUT_EXTRUDE2_REACH, mode=Mode.PRIVATE) & part.part
    # Sketch11 → Cut-Extrude2 (cut, up to next)
    with BuildSketch(Plane.ZY.offset(47.9913685), mode=Mode.PRIVATE) as cut_extrude2_sk3:
        with Locations((-5.467393779, 91.827764741)):
            Circle(SKETCH11_R)
    cut_extrude2_tool3 = extrude(cut_extrude2_sk3.sketch, amount=-CUT_EXTRUDE2_REACH, mode=Mode.PRIVATE) & part.part
    # Sketch11 → Cut-Extrude2 (cut, up to next)
    with BuildSketch(Plane.ZY.offset(47.9913685), mode=Mode.PRIVATE) as cut_extrude2_sk4:
        with Locations((5.532606221, 91.827764741)):
            Circle(SKETCH11_R)
    cut_extrude2_tool4 = extrude(cut_extrude2_sk4.sketch, amount=-CUT_EXTRUDE2_REACH, mode=Mode.PRIVATE) & part.part
    # Sketch11 → Cut-Extrude2 (cut, up to next)
    with BuildSketch(Plane.ZY.offset(47.9913685), mode=Mode.PRIVATE) as cut_extrude2_sk5:
        with Locations((0.032606221, 43.827764741)):
            Rectangle(SKETCH11_W, SKETCH11_H)
    cut_extrude2_tool5 = extrude(cut_extrude2_sk5.sketch, amount=-CUT_EXTRUDE2_REACH, mode=Mode.PRIVATE) & part.part
    # Sketch11 → Cut-Extrude2 (cut, up to next)
    with BuildSketch(Plane.ZY.offset(47.9913685), mode=Mode.PRIVATE) as cut_extrude2_sk6:
        with Locations((-5.467393779, 41.827764741)):
            Circle(SKETCH11_R)
    cut_extrude2_tool6 = extrude(cut_extrude2_sk6.sketch, amount=-CUT_EXTRUDE2_REACH, mode=Mode.PRIVATE) & part.part
    # Sketch11 → Cut-Extrude2 (cut, up to next)
    with BuildSketch(Plane.ZY.offset(47.9913685), mode=Mode.PRIVATE) as cut_extrude2_sk7:
        with Locations((5.532606221, 41.827764741)):
            Circle(SKETCH11_R)
    cut_extrude2_tool7 = extrude(cut_extrude2_sk7.sketch, amount=-CUT_EXTRUDE2_REACH, mode=Mode.PRIVATE) & part.part
    add(cut_extrude2_tool1.solids().sort_by_distance((-47.991369, 89.827765, 0.032606))[0], mode=Mode.SUBTRACT)
    add(cut_extrude2_tool2.solids().sort_by_distance((-47.991369, 66.827765, 0.032606))[0], mode=Mode.SUBTRACT)
    add(cut_extrude2_tool3.solids().sort_by_distance((-47.991369, 91.827765, -5.467394))[0], mode=Mode.SUBTRACT)
    add(cut_extrude2_tool4.solids().sort_by_distance((-47.991369, 91.827765, 5.532606))[0], mode=Mode.SUBTRACT)
    add(cut_extrude2_tool5.solids().sort_by_distance((-47.991369, 43.827765, 0.032606))[0], mode=Mode.SUBTRACT)
    add(cut_extrude2_tool6.solids().sort_by_distance((-47.991369, 41.827765, -5.467394))[0], mode=Mode.SUBTRACT)
    add(cut_extrude2_tool7.solids().sort_by_distance((-47.991369, 41.827765, 5.532606))[0], mode=Mode.SUBTRACT)


solid = part.part
